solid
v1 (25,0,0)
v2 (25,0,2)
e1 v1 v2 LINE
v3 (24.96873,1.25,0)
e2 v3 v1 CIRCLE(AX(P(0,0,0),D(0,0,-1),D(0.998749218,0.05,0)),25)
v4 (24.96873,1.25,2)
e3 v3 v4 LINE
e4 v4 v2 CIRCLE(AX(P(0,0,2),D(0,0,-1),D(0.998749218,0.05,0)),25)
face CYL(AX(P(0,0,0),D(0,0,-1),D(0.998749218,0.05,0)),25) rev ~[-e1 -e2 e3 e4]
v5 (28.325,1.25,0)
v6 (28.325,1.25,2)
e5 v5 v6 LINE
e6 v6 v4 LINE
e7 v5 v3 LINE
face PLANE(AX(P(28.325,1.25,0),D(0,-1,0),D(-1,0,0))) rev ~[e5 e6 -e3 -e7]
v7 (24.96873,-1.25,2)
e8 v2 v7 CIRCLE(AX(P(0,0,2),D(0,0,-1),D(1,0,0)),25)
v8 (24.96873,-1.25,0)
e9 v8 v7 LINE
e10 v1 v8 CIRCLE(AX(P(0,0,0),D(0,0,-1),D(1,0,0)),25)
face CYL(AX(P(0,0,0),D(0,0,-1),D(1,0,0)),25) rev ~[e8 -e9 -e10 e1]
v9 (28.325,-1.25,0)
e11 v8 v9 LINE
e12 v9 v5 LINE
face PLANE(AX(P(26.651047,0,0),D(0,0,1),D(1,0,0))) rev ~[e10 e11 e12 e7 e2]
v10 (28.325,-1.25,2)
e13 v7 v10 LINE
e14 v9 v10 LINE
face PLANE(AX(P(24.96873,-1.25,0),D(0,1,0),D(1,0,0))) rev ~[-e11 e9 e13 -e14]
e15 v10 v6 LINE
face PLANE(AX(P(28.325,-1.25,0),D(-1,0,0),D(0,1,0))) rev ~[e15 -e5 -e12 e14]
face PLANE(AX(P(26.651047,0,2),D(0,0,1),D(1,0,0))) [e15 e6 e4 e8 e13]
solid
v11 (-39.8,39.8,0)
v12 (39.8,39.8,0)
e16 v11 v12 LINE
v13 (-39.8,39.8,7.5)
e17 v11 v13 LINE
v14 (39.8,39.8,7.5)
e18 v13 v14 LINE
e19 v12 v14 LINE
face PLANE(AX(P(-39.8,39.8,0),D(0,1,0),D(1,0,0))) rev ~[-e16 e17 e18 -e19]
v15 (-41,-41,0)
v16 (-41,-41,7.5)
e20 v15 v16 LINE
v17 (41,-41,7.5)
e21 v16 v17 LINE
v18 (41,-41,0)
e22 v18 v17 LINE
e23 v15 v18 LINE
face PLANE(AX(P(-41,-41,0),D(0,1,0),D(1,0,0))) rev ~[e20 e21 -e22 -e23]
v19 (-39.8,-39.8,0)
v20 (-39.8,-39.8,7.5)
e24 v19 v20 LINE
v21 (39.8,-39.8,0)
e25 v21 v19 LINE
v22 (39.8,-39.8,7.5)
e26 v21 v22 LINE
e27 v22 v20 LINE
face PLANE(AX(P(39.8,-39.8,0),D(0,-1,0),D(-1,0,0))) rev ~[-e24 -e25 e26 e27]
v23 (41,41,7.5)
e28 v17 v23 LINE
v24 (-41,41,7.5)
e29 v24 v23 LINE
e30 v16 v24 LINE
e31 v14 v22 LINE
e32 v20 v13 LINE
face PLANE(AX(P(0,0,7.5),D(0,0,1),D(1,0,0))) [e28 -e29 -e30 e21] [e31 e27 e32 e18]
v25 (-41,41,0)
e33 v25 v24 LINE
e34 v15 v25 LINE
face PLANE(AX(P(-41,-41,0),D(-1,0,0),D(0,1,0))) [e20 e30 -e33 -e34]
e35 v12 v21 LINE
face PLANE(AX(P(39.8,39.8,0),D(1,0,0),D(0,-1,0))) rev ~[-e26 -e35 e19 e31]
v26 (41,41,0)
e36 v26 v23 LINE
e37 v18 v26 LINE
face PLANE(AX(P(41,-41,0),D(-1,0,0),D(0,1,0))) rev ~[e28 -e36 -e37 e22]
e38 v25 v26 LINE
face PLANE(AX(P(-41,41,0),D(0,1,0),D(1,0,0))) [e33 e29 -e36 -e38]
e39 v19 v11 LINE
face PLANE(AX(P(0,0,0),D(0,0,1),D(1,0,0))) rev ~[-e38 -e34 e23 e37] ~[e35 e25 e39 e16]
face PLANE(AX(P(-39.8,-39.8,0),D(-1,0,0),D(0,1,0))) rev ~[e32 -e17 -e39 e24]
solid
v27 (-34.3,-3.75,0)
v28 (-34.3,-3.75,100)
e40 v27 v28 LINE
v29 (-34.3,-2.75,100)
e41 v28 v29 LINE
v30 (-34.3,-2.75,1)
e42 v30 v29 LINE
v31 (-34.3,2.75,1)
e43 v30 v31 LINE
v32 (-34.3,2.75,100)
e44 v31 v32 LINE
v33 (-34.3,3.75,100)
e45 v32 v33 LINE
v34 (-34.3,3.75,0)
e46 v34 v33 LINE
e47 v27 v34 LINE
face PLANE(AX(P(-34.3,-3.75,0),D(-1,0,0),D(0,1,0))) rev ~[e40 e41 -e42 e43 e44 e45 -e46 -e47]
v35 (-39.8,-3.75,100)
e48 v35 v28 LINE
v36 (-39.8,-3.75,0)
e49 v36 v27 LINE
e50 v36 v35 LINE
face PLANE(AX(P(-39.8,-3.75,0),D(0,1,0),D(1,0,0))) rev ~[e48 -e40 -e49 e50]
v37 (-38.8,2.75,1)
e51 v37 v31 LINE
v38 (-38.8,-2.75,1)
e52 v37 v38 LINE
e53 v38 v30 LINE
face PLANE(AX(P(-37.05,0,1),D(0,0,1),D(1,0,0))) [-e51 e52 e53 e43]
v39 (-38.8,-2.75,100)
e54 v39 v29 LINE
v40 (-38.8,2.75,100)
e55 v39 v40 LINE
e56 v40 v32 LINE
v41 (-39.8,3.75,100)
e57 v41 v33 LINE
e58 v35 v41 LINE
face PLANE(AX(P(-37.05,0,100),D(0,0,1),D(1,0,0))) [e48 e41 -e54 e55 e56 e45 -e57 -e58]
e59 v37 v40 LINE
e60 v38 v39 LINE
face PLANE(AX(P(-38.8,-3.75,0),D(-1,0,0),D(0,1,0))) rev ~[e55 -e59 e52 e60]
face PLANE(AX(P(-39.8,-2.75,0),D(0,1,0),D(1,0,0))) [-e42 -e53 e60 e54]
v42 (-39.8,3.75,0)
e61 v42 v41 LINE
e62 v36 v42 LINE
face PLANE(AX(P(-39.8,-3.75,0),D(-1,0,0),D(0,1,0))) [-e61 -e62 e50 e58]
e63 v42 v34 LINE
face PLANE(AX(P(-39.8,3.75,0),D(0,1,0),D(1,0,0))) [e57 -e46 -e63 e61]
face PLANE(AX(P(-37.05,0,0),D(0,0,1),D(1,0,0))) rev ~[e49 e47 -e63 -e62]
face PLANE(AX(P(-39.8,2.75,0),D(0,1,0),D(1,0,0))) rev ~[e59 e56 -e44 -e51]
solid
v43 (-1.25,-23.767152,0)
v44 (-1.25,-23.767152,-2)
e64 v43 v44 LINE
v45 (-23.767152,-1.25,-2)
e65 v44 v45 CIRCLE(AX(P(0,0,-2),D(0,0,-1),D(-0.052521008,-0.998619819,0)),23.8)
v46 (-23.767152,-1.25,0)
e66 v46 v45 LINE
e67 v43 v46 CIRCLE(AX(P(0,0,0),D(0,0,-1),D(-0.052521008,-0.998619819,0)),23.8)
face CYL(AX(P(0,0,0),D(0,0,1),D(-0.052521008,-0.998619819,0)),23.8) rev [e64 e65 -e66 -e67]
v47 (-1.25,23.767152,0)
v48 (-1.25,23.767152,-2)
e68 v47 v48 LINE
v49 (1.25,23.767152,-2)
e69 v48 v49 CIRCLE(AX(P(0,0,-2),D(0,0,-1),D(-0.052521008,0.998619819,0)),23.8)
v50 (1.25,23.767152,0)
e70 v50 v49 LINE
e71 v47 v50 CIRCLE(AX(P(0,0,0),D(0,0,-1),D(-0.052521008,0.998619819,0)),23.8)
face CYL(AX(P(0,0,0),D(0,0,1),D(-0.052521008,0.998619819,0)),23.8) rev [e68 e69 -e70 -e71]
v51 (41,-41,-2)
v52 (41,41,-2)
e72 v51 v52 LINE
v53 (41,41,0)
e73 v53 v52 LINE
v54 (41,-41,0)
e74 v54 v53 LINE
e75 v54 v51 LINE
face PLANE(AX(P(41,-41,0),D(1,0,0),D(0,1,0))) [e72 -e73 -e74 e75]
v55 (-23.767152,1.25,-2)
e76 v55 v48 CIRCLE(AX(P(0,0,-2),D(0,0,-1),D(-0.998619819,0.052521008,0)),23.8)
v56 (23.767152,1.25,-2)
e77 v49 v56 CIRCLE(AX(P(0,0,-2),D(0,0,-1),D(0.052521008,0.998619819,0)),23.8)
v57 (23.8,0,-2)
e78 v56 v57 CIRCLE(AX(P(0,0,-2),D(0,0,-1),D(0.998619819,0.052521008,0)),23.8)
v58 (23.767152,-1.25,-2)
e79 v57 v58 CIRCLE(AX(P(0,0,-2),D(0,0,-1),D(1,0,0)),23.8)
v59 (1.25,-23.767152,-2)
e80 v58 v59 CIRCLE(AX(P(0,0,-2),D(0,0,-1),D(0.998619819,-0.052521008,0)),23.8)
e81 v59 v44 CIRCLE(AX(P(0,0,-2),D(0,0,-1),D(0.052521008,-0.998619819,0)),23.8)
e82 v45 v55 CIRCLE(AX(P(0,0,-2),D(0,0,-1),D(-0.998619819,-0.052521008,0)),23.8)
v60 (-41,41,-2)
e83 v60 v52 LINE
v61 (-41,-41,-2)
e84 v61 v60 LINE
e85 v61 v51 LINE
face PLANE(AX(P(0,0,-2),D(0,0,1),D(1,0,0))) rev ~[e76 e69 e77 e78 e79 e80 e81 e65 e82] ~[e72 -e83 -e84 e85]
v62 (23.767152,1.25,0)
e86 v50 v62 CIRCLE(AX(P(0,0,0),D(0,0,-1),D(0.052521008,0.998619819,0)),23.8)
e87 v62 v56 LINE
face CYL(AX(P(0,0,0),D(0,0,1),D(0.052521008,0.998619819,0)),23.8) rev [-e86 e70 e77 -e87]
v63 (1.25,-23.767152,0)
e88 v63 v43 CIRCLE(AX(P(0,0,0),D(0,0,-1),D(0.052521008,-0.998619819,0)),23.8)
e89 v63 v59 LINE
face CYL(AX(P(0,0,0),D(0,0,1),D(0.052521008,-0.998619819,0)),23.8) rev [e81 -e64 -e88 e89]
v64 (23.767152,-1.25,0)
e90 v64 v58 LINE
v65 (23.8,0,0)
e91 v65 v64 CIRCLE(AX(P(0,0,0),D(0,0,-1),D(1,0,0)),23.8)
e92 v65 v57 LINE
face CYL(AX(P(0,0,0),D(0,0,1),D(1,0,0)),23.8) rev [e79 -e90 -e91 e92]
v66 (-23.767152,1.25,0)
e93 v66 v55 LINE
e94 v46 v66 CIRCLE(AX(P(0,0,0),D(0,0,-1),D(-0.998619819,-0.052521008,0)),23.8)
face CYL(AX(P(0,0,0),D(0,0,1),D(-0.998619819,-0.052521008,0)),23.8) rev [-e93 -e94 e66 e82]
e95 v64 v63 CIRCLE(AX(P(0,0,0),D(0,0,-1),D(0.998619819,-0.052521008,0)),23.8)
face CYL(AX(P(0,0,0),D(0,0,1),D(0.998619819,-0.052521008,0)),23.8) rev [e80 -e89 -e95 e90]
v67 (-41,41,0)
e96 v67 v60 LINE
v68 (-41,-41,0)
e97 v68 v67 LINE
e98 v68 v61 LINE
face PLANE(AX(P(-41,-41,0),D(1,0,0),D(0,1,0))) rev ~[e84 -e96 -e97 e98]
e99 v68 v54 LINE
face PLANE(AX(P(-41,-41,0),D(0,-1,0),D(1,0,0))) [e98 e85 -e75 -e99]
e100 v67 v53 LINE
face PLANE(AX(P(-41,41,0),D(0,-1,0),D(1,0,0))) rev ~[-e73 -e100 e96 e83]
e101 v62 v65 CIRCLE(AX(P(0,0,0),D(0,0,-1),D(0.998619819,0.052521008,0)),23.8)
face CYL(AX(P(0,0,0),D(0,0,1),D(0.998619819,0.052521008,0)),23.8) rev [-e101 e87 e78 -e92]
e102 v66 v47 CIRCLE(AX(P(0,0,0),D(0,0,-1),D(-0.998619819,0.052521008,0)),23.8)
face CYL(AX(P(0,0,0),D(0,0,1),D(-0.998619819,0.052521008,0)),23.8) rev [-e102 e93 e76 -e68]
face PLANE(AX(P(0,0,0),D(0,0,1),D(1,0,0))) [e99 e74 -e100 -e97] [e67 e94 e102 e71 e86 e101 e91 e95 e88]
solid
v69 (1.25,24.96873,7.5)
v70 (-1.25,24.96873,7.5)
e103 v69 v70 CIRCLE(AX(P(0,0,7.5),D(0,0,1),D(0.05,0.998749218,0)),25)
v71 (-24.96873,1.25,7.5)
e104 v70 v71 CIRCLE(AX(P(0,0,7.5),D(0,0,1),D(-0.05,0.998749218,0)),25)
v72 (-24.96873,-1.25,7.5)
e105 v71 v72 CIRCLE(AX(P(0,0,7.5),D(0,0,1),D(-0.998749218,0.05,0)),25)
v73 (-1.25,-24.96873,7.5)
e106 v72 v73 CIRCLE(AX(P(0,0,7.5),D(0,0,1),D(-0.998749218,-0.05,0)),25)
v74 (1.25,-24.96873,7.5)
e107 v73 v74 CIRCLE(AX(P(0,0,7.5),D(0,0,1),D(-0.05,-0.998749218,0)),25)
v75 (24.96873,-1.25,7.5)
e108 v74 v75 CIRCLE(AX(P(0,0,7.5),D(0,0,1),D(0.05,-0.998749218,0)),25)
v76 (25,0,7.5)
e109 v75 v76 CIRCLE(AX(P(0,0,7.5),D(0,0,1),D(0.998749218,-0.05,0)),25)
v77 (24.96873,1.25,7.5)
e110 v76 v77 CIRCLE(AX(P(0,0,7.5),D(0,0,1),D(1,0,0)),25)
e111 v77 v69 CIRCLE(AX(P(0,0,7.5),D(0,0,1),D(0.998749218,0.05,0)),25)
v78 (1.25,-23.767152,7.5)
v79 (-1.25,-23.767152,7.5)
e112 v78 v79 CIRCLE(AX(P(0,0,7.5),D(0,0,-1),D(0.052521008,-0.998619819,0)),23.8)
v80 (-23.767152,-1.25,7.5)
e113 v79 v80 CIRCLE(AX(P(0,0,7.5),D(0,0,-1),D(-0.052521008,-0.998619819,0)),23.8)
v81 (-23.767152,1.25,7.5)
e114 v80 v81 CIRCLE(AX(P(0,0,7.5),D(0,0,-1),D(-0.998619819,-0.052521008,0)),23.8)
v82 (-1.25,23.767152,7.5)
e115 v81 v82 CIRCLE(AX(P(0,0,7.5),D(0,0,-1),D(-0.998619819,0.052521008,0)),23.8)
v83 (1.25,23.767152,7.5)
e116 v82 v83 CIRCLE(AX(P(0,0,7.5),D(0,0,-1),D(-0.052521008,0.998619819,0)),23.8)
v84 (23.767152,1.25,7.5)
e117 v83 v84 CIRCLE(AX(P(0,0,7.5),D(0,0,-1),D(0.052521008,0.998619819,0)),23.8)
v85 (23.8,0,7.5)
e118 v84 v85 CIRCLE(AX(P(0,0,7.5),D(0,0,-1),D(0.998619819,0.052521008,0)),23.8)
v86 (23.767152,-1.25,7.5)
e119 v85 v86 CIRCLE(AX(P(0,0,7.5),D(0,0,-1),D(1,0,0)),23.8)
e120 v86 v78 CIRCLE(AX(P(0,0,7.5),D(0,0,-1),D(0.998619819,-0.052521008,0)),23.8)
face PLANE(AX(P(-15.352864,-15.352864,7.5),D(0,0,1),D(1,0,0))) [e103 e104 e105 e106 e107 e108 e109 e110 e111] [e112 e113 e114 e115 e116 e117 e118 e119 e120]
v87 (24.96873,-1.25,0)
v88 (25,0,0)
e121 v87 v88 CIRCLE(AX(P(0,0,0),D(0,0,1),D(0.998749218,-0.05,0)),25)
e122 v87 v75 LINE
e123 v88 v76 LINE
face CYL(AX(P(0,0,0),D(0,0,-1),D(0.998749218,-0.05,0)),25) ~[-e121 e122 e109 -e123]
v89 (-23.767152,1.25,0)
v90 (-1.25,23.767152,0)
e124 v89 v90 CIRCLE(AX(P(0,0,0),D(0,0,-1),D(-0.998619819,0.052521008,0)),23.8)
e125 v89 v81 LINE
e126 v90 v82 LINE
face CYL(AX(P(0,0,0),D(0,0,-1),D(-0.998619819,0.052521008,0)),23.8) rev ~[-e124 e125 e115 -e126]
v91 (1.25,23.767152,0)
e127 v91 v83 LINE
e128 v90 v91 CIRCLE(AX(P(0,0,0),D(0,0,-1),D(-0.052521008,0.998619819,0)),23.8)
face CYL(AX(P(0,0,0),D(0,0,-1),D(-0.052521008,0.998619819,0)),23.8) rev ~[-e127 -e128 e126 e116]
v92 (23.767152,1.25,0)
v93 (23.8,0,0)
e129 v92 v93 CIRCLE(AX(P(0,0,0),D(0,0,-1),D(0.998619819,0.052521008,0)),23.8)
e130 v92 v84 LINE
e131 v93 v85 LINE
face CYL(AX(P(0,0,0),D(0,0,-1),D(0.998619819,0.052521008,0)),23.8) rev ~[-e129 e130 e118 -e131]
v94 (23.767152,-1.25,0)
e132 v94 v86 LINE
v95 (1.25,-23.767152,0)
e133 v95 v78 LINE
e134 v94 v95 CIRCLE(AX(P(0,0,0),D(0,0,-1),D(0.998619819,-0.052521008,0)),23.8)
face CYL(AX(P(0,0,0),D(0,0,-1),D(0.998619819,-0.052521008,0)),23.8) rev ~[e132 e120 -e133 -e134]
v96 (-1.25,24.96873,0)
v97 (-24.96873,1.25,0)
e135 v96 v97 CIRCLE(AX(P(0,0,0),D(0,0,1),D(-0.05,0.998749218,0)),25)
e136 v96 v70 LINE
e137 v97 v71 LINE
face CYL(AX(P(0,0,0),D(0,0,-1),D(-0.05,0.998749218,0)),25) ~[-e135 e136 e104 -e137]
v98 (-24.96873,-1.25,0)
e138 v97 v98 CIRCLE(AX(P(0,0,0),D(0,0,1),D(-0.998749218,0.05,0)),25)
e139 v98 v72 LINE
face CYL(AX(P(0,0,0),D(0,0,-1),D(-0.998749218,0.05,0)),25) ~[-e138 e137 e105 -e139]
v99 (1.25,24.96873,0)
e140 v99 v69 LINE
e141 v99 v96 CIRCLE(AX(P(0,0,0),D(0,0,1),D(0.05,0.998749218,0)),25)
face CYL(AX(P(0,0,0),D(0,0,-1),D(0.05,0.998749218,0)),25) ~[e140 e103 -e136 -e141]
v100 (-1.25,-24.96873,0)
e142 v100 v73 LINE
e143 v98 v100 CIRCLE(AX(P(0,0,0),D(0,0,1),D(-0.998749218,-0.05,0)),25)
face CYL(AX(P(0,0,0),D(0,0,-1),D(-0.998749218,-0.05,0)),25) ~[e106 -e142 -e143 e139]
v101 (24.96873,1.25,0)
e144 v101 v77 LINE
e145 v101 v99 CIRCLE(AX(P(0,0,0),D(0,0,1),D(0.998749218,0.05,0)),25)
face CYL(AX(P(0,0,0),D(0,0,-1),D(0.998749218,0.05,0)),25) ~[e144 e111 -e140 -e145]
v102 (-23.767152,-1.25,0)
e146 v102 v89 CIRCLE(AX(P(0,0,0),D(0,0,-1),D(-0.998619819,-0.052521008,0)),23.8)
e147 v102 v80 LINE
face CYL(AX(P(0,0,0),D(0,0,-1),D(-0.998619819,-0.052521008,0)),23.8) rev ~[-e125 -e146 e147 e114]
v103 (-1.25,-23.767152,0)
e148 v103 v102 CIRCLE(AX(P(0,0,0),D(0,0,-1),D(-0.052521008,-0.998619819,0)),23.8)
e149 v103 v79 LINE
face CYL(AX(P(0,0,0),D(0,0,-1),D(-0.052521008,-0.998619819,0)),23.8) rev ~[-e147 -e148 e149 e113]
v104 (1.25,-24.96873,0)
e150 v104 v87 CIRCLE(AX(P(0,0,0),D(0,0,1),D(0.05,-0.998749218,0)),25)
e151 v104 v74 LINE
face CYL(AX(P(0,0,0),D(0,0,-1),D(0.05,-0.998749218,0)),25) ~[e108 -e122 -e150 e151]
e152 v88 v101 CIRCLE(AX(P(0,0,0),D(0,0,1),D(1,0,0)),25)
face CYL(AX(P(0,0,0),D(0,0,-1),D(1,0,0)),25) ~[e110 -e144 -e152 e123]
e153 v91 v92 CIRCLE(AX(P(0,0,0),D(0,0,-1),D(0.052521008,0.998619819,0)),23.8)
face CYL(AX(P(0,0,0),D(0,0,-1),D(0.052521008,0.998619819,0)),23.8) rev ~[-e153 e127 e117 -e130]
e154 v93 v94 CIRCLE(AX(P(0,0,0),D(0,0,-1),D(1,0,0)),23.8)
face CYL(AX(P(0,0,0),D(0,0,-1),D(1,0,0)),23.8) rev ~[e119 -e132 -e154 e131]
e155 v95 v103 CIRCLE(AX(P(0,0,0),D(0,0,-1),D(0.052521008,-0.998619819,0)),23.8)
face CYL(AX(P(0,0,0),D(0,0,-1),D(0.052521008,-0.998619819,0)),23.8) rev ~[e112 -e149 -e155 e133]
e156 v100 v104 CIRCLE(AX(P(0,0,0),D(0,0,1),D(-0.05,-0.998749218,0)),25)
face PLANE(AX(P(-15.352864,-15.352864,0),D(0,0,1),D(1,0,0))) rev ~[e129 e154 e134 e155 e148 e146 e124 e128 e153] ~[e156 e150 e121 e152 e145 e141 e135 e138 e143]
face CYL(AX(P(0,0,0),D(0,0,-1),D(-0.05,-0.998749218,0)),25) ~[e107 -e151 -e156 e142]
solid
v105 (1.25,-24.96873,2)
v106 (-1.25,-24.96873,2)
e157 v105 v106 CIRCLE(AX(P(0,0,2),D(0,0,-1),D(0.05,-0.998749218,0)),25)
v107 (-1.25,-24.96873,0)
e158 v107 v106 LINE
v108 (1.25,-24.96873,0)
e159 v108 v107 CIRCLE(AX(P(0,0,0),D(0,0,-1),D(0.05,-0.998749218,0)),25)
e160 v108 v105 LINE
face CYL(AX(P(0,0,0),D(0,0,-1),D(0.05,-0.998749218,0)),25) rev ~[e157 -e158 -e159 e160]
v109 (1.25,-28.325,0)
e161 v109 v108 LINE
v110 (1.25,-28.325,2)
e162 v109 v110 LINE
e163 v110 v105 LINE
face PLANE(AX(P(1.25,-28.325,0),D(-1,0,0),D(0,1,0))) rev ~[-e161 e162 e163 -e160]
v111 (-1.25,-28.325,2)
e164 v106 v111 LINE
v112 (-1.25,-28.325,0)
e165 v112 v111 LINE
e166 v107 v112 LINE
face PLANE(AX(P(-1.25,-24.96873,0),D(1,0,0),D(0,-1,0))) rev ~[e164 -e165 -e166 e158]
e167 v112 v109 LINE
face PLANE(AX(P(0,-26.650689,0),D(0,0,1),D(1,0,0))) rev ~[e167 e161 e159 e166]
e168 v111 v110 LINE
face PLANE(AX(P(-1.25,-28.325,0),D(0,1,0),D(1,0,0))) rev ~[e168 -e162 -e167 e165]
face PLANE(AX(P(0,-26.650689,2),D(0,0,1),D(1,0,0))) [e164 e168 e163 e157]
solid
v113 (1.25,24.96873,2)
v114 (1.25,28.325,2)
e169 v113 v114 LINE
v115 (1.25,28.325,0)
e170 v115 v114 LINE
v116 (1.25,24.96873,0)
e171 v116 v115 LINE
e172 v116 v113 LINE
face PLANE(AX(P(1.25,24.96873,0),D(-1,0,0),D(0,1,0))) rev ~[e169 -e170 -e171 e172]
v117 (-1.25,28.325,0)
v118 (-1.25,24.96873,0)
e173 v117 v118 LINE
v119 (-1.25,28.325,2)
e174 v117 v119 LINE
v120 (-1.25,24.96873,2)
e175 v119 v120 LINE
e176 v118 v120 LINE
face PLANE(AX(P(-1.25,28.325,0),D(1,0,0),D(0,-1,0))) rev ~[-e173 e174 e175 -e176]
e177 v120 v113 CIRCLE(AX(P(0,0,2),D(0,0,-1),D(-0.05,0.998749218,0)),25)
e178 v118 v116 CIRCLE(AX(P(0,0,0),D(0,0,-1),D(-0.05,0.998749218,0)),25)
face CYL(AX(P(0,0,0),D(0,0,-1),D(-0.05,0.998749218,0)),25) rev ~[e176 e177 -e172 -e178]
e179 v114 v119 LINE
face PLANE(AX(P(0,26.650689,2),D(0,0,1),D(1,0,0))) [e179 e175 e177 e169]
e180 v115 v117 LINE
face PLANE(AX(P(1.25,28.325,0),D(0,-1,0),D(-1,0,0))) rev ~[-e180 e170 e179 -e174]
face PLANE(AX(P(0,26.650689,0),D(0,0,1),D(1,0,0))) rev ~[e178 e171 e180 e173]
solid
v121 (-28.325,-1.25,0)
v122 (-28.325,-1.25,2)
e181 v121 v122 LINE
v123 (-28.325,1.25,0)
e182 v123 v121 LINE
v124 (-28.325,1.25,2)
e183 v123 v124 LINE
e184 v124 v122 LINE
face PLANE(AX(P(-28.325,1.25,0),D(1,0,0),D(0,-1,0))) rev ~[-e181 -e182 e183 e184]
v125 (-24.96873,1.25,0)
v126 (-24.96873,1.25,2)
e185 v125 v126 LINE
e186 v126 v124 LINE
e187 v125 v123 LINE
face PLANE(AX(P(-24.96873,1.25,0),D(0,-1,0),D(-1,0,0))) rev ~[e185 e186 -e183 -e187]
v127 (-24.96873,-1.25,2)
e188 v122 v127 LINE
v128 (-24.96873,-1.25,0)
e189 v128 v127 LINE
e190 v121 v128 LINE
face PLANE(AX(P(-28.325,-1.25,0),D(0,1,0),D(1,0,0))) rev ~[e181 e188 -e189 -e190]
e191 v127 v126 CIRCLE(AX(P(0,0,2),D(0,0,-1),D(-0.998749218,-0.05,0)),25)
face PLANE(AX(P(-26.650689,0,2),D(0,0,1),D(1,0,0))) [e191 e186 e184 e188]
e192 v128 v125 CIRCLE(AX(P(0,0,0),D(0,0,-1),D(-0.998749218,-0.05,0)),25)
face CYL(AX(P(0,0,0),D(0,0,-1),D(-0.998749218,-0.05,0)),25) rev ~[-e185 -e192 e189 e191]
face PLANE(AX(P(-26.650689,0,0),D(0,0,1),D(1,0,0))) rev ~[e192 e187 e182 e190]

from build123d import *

# Parameters (mm, degrees)
F1_DEPTH = 7.5
F0_W     = 82
F0_H     = 82
F0_R     = 32.8
F0_W_2   = 5.5
F0_H_2   = 7.5
F2_DEPTH = 2
F3_DEPTH = 2
F4_DEPTH = 100
F5_T     = -1


# Not quite as in the source:
# - a feature names something its author has since deleted; it is built from what else it names


with BuildPart() as f1:
    # F0 (on Top) → F1 (new body)
    with BuildSketch(Plane.XY):
        with BuildLine():
            ThreePointArc((-24.9687304443, -1.25), (-17.6776695297, -17.6776695297), (-1.25, -24.9687304443))
            Line((-1.25, -24.9687304443), (-1.25, -23.7671517015))
            ThreePointArc((-1.25, -23.7671517015), (-16.8291413922, -16.8291413922), (-23.7671517015, -1.25))
            Line((-23.7671517015, -1.25), (-24.9687304443, -1.25))
        make_face()
        with BuildLine():
            Line((-1.25, 23.7671517015), (-1.25, 24.9687304443))
            ThreePointArc((-1.25, 24.9687304443), (-17.6776695297, 17.6776695297), (-24.9687304443, 1.25))
            Line((-24.9687304443, 1.25), (-23.7671517015, 1.25))
            ThreePointArc((-23.7671517015, 1.25), (-16.8291413922, 16.8291413922), (-1.25, 23.7671517015))
        make_face()
        with BuildLine():
            Line((23.7671517015, 1.25), (24.9687304443, 1.25))
            ThreePointArc((24.9687304443, 1.25), (17.6776695297, 17.6776695297), (1.25, 24.9687304443))
            Line((1.25, 24.9687304443), (1.25, 23.7671517015))
            ThreePointArc((1.25, 23.7671517015), (16.8291413922, 16.8291413922), (23.7671517015, 1.25))
        make_face()
        with BuildLine():
            ThreePointArc((1.25, -24.9687304443), (17.6776695297, -17.6776695297), (24.9687304443, -1.25))
            Line((24.9687304443, -1.25), (23.7671517015, -1.25))
            ThreePointArc((23.7671517015, -1.25), (16.8291413922, -16.8291413922), (1.25, -23.7671517015))
            Line((1.25, -23.7671517015), (1.25, -24.9687304443))
        make_face()
        with BuildLine():
            Line((1.25, 23.7671517015), (1.25, 24.9687304443))
            ThreePointArc((1.25, 24.9687304443), (0, 25), (-1.25, 24.9687304443))
            Line((-1.25, 24.9687304443), (-1.25, 23.7671517015))
            ThreePointArc((-1.25, 23.7671517015), (0, 23.8), (1.25, 23.7671517015))
        make_face()
        with BuildLine():
            ThreePointArc((-1.25, -24.9687304443), (0, -25), (1.25, -24.9687304443))
            Line((1.25, -24.9687304443), (1.25, -23.7671517015))
            ThreePointArc((1.25, -23.7671517015), (0, -23.8), (-1.25, -23.7671517015))
            Line((-1.25, -23.7671517015), (-1.25, -24.9687304443))
        make_face()
        with BuildLine():
            ThreePointArc((24.9687304443, -1.25), (24.9921813885, -0.6251955264), (25, 0))
            ThreePointArc((25, 0), (24.9921813885, 0.6251955264), (24.9687304443, 1.25))
            Line((24.9687304443, 1.25), (23.7671517015, 1.25))
            ThreePointArc((23.7671517015, 1.25), (23.7917865081, 0.6252157649), (23.8, 0))
            ThreePointArc((23.8, 0), (23.7917865081, -0.6252157649), (23.7671517015, -1.25))
            Line((23.7671517015, -1.25), (24.9687304443, -1.25))
        make_face()
        with BuildLine():
            Line((-23.7671517015, 1.25), (-24.9687304443, 1.25))
            ThreePointArc((-24.9687304443, 1.25), (-25, 0), (-24.9687304443, -1.25))
            Line((-24.9687304443, -1.25), (-23.7671517015, -1.25))
            ThreePointArc((-23.7671517015, -1.25), (-23.8, 0), (-23.7671517015, 1.25))
        make_face()
    extrude(amount=F1_DEPTH)


with BuildPart() as f1b:
    # F0 (on Top) → F1, piece 2 (new body)
    with BuildSketch(Plane.XY):
        Rectangle(F0_W, F0_H)
        Polygon((-39.8, 3.75), (-39.8, 39.8), (39.8, 39.8), (39.8, -39.8), (-39.8, -39.8), (-39.8, -3.75), align=None, mode=Mode.SUBTRACT)
    extrude(amount=F1_DEPTH)


with BuildPart() as f2:
    # F0 (on Top) → F2 (new body)
    with BuildSketch(Plane.XY):
        Rectangle(F0_W, F0_H)
        Polygon((-39.8, 3.75), (-39.8, 39.8), (39.8, 39.8), (39.8, -39.8), (-39.8, -39.8), (-39.8, -3.75), align=None, mode=Mode.SUBTRACT)
        Polygon((39.8, 39.8), (-39.8, 39.8), (-39.8, 3.75), (-34.3, 3.75), (-34.3, -3.75), (-39.8, -3.75), (-39.8, -39.8), (39.8, -39.8), align=None)
        Circle(F0_R, mode=Mode.SUBTRACT)
        Circle(F0_R)
        with BuildLine():
            ThreePointArc((1.25, 24.9687304443), (17.6776695297, 17.6776695297), (24.9687304443, 1.25))
            Line((24.9687304443, 1.25), (28.325, 1.25))
            Line((28.325, 1.25), (28.325, -1.25))
            Line((28.325, -1.25), (24.9687304443, -1.25))
            ThreePointArc((24.9687304443, -1.25), (17.6776695297, -17.6776695297), (1.25, -24.9687304443))
            Line((1.25, -24.9687304443), (1.25, -28.325))
            Line((1.25, -28.325), (-1.25, -28.325))
            Line((-1.25, -28.325), (-1.25, -24.9687304443))
            ThreePointArc((-1.25, -24.9687304443), (-17.6776695297, -17.6776695297), (-24.9687304443, -1.25))
            Line((-24.9687304443, -1.25), (-28.325, -1.25))
            Line((-28.325, -1.25), (-28.325, 1.25))
            Line((-28.325, 1.25), (-24.9687304443, 1.25))
            ThreePointArc((-24.9687304443, 1.25), (-17.6776695297, 17.6776695297), (-1.25, 24.9687304443))
            Line((-1.25, 24.9687304443), (-1.25, 28.325))
            Line((-1.25, 28.325), (1.25, 28.325))
            Line((1.25, 28.325), (1.25, 24.9687304443))
        make_face(mode=Mode.SUBTRACT)
        with BuildLine():
            Line((23.7671517015, 1.25), (24.9687304443, 1.25))
            ThreePointArc((24.9687304443, 1.25), (17.6776695297, 17.6776695297), (1.25, 24.9687304443))
            Line((1.25, 24.9687304443), (1.25, 23.7671517015))
            ThreePointArc((1.25, 23.7671517015), (16.8291413922, 16.8291413922), (23.7671517015, 1.25))
        make_face()
        with BuildLine():
            Line((-1.25, 23.7671517015), (-1.25, 24.9687304443))
            ThreePointArc((-1.25, 24.9687304443), (-17.6776695297, 17.6776695297), (-24.9687304443, 1.25))
            Line((-24.9687304443, 1.25), (-23.7671517015, 1.25))
            ThreePointArc((-23.7671517015, 1.25), (-16.8291413922, 16.8291413922), (-1.25, 23.7671517015))
        make_face()
        with BuildLine():
            ThreePointArc((-24.9687304443, -1.25), (-17.6776695297, -17.6776695297), (-1.25, -24.9687304443))
            Line((-1.25, -24.9687304443), (-1.25, -23.7671517015))
            ThreePointArc((-1.25, -23.7671517015), (-16.8291413922, -16.8291413922), (-23.7671517015, -1.25))
            Line((-23.7671517015, -1.25), (-24.9687304443, -1.25))
        make_face()
        with BuildLine():
            ThreePointArc((1.25, -24.9687304443), (17.6776695297, -17.6776695297), (24.9687304443, -1.25))
            Line((24.9687304443, -1.25), (23.7671517015, -1.25))
            ThreePointArc((23.7671517015, -1.25), (16.8291413922, -16.8291413922), (1.25, -23.7671517015))
            Line((1.25, -23.7671517015), (1.25, -24.9687304443))
        make_face()
        with Locations((-37.05, 0)):
            Rectangle(F0_W_2, F0_H_2)
        with BuildLine():
            ThreePointArc((-24.9687304443, -1.25), (-25, 0), (-24.9687304443, 1.25))
            Line((-24.9687304443, 1.25), (-28.325, 1.25))
            Line((-28.325, 1.25), (-28.325, -1.25))
            Line((-28.325, -1.25), (-24.9687304443, -1.25))
        make_face()
        with BuildLine():
            Line((1.25, -28.325), (1.25, -24.9687304443))
            ThreePointArc((1.25, -24.9687304443), (0, -25), (-1.25, -24.9687304443))
            Line((-1.25, -24.9687304443), (-1.25, -28.325))
            Line((-1.25, -28.325), (1.25, -28.325))
        make_face()
        with BuildLine():
            ThreePointArc((-1.25, 24.9687304443), (0, 25), (1.25, 24.9687304443))
            Line((1.25, 24.9687304443), (1.25, 28.325))
            Line((1.25, 28.325), (-1.25, 28.325))
            Line((-1.25, 28.325), (-1.25, 24.9687304443))
        make_face()
        with BuildLine():
            ThreePointArc((24.9687304443, 1.25), (24.9921813885, 0.6251955264), (25, 0))
            ThreePointArc((25, 0), (24.9921813885, -0.6251955264), (24.9687304443, -1.25))
            Line((24.9687304443, -1.25), (28.325, -1.25))
            Line((28.325, -1.25), (28.325, 1.25))
            Line((28.325, 1.25), (24.9687304443, 1.25))
        make_face()
        with BuildLine():
            Line((1.25, 23.7671517015), (1.25, 24.9687304443))
            ThreePointArc((1.25, 24.9687304443), (0, 25), (-1.25, 24.9687304443))
            Line((-1.25, 24.9687304443), (-1.25, 23.7671517015))
            ThreePointArc((-1.25, 23.7671517015), (0, 23.8), (1.25, 23.7671517015))
        make_face()
        with BuildLine():
            Line((-23.7671517015, 1.25), (-24.9687304443, 1.25))
            ThreePointArc((-24.9687304443, 1.25), (-25, 0), (-24.9687304443, -1.25))
            Line((-24.9687304443, -1.25), (-23.7671517015, -1.25))
            ThreePointArc((-23.7671517015, -1.25), (-23.8, 0), (-23.7671517015, 1.25))
        make_face()
        with BuildLine():
            ThreePointArc((-1.25, -24.9687304443), (0, -25), (1.25, -24.9687304443))
            Line((1.25, -24.9687304443), (1.25, -23.7671517015))
            ThreePointArc((1.25, -23.7671517015), (0, -23.8), (-1.25, -23.7671517015))
            Line((-1.25, -23.7671517015), (-1.25, -24.9687304443))
        make_face()
        with BuildLine():
            ThreePointArc((24.9687304443, -1.25), (24.9921813885, -0.6251955264), (25, 0))
            ThreePointArc((25, 0), (24.9921813885, 0.6251955264), (24.9687304443, 1.25))
            Line((24.9687304443, 1.25), (23.7671517015, 1.25))
            ThreePointArc((23.7671517015, 1.25), (23.7917865081, 0.6252157649), (23.8, 0))
            ThreePointArc((23.8, 0), (23.7917865081, -0.6252157649), (23.7671517015, -1.25))
            Line((23.7671517015, -1.25), (24.9687304443, -1.25))
        make_face()
    extrude(amount=-F2_DEPTH)


with BuildPart() as f3:
    # F0 (on Top) → F3 (new body)
    with BuildSketch(Plane.XY):
        with BuildLine():
            ThreePointArc((-24.9687304443, -1.25), (-25, 0), (-24.9687304443, 1.25))
            Line((-24.9687304443, 1.25), (-28.325, 1.25))
            Line((-28.325, 1.25), (-28.325, -1.25))
            Line((-28.325, -1.25), (-24.9687304443, -1.25))
        make_face()
    extrude(amount=F3_DEPTH)


with BuildPart() as f3b:
    # F0 (on Top) → F3, piece 2 (new body)
    with BuildSketch(Plane.XY):
        with BuildLine():
            ThreePointArc((-1.25, 24.9687304443), (0, 25), (1.25, 24.9687304443))
            Line((1.25, 24.9687304443), (1.25, 28.325))
            Line((1.25, 28.325), (-1.25, 28.325))
            Line((-1.25, 28.325), (-1.25, 24.9687304443))
        make_face()
    extrude(amount=F3_DEPTH)


with BuildPart() as f3c:
    # F0 (on Top) → F3, piece 3 (new body)
    with BuildSketch(Plane.XY):
        with BuildLine():
            ThreePointArc((24.9687304443, 1.25), (24.9921813885, 0.6251955264), (25, 0))
            ThreePointArc((25, 0), (24.9921813885, -0.6251955264), (24.9687304443, -1.25))
            Line((24.9687304443, -1.25), (28.325, -1.25))
            Line((28.325, -1.25), (28.325, 1.25))
            Line((28.325, 1.25), (24.9687304443, 1.25))
        make_face()
    extrude(amount=F3_DEPTH)


with BuildPart() as f3d:
    # F0 (on Top) → F3, piece 4 (new body)
    with BuildSketch(Plane.XY):
        with BuildLine():
            Line((1.25, -28.325), (1.25, -24.9687304443))
            ThreePointArc((1.25, -24.9687304443), (0, -25), (-1.25, -24.9687304443))
            Line((-1.25, -24.9687304443), (-1.25, -28.325))
            Line((-1.25, -28.325), (1.25, -28.325))
        make_face()
    extrude(amount=F3_DEPTH)


with BuildPart() as f4:
    # F0 (on Top) → F4 (new body)
    with BuildSketch(Plane.XY):
        with Locations((-37.05, 0)):
            Rectangle(F0_W_2, F0_H_2)
    extrude(amount=F4_DEPTH)

    # F5
    f5_openings = [f4.faces().sort_by_distance(p)[0] for p in [
        (-37.05, 0, 100),
        (-34.3, 0, 50),
    ]]
    offset(amount=F5_T, openings=f5_openings)


solid = Compound([f1.part, f1b.part, f2.part, f3.part, f3b.part, f3c.part, f3d.part, f4.part])
